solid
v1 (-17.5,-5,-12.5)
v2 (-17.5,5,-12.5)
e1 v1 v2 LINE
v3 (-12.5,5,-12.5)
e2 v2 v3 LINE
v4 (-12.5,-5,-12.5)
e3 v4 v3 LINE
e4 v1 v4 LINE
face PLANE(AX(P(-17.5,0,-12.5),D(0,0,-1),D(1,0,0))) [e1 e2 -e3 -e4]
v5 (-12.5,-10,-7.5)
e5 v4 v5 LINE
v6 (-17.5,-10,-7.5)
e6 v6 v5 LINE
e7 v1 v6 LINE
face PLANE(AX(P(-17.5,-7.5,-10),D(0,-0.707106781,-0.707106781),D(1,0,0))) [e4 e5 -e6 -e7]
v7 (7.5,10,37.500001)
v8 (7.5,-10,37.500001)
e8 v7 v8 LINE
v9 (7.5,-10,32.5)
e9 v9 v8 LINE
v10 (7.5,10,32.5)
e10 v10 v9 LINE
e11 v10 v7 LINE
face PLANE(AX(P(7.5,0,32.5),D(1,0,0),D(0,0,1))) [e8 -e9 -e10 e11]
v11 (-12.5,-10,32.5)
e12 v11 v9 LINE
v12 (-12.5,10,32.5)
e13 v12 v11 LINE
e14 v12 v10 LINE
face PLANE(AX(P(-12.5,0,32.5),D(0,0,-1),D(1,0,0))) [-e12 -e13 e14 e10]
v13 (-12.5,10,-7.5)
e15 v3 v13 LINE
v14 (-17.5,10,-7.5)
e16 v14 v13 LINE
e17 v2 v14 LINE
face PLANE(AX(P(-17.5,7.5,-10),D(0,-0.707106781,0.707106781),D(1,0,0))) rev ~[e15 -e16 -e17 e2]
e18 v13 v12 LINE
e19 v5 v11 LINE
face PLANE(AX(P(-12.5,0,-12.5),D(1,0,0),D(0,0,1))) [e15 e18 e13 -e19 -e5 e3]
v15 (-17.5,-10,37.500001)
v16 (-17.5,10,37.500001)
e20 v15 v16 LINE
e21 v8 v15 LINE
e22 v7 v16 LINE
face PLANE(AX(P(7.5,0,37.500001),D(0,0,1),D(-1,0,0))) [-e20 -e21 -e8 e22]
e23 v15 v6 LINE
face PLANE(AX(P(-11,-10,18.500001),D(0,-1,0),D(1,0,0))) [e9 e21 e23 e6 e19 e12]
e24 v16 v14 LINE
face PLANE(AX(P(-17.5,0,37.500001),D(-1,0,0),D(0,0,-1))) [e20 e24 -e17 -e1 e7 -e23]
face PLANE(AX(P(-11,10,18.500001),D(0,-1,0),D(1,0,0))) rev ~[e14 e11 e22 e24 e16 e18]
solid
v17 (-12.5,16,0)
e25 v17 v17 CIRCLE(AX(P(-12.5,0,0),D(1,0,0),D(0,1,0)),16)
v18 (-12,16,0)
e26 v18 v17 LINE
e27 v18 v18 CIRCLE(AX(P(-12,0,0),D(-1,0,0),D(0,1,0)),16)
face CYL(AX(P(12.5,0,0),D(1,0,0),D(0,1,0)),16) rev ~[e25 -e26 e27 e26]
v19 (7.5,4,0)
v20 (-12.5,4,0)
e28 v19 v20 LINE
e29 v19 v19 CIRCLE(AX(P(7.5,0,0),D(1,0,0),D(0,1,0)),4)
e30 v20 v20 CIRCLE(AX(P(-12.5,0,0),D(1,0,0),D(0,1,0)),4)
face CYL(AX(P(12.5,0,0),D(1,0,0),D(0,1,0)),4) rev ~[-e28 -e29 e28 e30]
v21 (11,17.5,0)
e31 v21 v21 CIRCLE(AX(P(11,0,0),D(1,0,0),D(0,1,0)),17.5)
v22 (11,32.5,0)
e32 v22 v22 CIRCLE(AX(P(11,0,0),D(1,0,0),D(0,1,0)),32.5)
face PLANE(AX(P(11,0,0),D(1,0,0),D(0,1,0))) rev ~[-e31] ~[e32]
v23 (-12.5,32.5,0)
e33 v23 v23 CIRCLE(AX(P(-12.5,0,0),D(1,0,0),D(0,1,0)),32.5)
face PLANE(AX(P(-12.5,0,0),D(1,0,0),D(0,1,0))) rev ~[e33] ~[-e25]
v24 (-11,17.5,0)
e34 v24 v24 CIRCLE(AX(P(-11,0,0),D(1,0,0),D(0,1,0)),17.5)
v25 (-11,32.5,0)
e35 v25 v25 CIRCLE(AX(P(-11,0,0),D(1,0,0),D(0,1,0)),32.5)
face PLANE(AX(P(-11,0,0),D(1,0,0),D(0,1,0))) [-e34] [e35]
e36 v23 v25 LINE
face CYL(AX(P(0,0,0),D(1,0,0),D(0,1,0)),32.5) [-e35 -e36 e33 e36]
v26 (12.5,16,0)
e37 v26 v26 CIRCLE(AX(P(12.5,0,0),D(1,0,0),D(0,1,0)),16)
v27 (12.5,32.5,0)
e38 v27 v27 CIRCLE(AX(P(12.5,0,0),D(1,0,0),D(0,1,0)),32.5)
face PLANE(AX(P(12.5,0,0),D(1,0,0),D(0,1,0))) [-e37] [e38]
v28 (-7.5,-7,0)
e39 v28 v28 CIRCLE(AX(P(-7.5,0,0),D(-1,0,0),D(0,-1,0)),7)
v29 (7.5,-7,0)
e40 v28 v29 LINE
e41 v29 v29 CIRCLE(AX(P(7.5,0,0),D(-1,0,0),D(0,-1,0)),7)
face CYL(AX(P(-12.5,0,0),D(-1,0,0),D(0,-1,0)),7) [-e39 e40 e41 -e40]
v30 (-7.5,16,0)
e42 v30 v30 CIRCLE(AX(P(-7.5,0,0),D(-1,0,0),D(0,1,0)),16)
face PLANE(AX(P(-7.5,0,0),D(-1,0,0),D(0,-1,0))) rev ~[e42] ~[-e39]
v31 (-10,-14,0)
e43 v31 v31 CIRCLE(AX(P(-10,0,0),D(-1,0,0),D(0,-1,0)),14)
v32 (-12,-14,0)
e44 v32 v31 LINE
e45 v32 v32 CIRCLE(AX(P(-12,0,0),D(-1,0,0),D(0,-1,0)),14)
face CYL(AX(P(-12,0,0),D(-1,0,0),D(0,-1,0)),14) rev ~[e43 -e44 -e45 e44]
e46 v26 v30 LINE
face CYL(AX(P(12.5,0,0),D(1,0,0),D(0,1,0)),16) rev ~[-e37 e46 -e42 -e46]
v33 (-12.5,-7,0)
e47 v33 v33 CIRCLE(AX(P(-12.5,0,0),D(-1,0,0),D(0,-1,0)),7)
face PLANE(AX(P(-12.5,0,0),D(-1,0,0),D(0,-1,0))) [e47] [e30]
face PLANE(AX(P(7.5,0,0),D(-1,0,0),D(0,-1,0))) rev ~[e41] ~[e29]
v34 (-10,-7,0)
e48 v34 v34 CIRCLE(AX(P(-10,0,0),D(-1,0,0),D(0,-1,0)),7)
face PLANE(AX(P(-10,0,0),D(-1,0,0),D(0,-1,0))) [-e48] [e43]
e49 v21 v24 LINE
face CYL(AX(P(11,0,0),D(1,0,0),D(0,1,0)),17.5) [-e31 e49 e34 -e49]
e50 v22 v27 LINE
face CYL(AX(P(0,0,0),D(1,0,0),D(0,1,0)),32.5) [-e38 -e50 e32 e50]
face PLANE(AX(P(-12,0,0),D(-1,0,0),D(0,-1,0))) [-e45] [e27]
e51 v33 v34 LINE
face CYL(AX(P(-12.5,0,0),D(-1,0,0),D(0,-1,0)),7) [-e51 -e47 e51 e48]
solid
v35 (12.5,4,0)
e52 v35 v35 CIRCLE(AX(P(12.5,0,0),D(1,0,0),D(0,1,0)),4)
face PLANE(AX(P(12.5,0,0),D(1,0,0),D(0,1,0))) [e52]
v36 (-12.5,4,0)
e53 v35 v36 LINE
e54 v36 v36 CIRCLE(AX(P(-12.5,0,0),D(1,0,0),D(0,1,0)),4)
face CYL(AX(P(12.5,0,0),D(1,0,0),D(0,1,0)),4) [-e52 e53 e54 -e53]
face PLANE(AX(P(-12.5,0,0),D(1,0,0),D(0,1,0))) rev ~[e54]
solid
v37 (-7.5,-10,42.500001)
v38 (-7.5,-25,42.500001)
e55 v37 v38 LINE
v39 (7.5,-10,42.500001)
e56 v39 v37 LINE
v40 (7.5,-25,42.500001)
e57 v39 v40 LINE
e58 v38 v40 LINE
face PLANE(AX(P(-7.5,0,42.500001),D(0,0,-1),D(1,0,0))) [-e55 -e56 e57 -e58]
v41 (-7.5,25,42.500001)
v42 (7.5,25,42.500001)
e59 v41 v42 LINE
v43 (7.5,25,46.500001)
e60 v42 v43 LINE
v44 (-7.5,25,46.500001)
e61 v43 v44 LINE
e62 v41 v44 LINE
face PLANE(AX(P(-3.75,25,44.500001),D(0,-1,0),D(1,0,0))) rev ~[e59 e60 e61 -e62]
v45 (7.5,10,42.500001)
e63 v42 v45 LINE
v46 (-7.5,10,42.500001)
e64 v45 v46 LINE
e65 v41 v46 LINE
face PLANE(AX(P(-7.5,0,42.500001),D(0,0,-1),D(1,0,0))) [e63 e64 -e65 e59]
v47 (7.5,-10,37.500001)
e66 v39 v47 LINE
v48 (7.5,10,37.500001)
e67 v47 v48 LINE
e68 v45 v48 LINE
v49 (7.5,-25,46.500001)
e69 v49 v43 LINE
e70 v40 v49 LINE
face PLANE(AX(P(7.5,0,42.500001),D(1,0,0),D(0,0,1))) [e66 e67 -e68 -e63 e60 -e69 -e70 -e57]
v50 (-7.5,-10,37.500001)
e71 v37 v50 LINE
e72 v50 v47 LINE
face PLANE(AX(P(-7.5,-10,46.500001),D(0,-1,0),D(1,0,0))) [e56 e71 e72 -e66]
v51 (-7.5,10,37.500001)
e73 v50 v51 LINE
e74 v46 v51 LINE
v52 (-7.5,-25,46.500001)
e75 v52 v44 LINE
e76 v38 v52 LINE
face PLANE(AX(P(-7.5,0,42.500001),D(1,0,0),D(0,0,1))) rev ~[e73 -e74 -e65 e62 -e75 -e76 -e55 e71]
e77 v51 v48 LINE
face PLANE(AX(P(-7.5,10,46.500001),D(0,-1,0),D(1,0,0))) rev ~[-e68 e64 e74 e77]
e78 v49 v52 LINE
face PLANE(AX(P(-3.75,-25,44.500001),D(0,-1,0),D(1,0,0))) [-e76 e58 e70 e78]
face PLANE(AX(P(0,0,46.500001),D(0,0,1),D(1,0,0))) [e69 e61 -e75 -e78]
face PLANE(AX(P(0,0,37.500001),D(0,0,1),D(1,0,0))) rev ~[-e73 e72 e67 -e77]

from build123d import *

# Parameters (mm, degrees)
F0_R      = 32.5
F1_DEPTH  = 12.5
F3_DEPTH  = 10
F2_W      = 7.5
F2_H      = 4
F4_DEPTH  = 25
F5_W      = 15
F5_H      = 20
F6_DEPTH  = 9
F7_R      = 4
F8_DEPTH  = 25
F9_START  = -1.5
F7_R_2    = 32.5
F7_R_3    = 17.5
F9_DEPTH  = 22
F7_R_4    = 16
F10_DEPTH = 25
F11_SIZE  = 5
F13_START = -0.5
F12_R     = 16
F12_R_2   = 14
F13_DEPTH = 2
F14_START = -2.5
F12_R_3   = 7
F14_DEPTH = 2.5
F15_DEPTH = 20
F16_DEPTH = 25


with BuildPart() as f1:
    # F0 (on Right) → F1 (new body, symmetric)
    with BuildSketch(Plane.YZ):
        Circle(F0_R)
    extrude(amount=F1_DEPTH, both=True)

    # F7 (on face) → F9 (cut)
    with BuildSketch(Plane.YZ.offset(12.5).offset(F9_START)):
        Circle(F7_R_2)
        Circle(F7_R_3, mode=Mode.SUBTRACT)
    extrude(amount=-F9_DEPTH, mode=Mode.SUBTRACT)

    # F7 (on face) → F10 (cut)
    with BuildSketch(Plane.YZ.offset(12.5)):
        Circle(F7_R_4)
        Circle(F7_R, mode=Mode.SUBTRACT)
        Circle(F7_R)
    extrude(amount=-F10_DEPTH, mode=Mode.SUBTRACT)

    # F12 (on face) → F13 (join)
    with BuildSketch(Plane(origin=(-12.5, 0, 0), x_dir=(0, -1, 0), z_dir=(-1, 0, 0)).offset(F13_START)):
        Circle(F12_R)
        Circle(F12_R_2, mode=Mode.SUBTRACT)
    extrude(amount=-F13_DEPTH)

    # F12 (on face) → F14 (join)
    with BuildSketch(Plane(origin=(-12.5, 0, 0), x_dir=(0, -1, 0), z_dir=(-1, 0, 0)).offset(F14_START)):
        Circle(F12_R)
        Circle(F12_R_2, mode=Mode.SUBTRACT)
        Circle(F12_R_2)
        Circle(F12_R_3, mode=Mode.SUBTRACT)
        Circle(F12_R_3)
    extrude(amount=-F14_DEPTH)

    # F12 (on face) → F15 (join)
    with BuildSketch(Plane(origin=(-12.5, 0, 0), x_dir=(0, -1, 0), z_dir=(-1, 0, 0))):
        Circle(F12_R_3)
    extrude(amount=-F15_DEPTH)

    # F7 (on face) → F16 (cut)
    with BuildSketch(Plane.YZ.offset(12.5)):
        Circle(F7_R)
    extrude(amount=-F16_DEPTH, mode=Mode.SUBTRACT)


with BuildPart() as f3:
    # F2 (on Front) → F3 (new body, symmetric)
    with BuildSketch(Plane.XZ):
        Polygon((-12.5, -12.5), (-12.5, 32.5), (7.5, 32.5), (7.5, 37.5000014901), (-17.5, 37.5000014901), (-17.5, -12.5), align=None)
    extrude(amount=F3_DEPTH, both=True)

    # F11
    f11_edges = [f3.edges().sort_by_distance(p)[0] for p in [
        (-15, 10, -12.5),
        (-15, -10, -12.5),
    ]]
    chamfer(f11_edges, length=F11_SIZE)


with BuildPart() as f4:
    # F2 (on Front) → F4 (new body, symmetric)
    with BuildSketch(Plane.XZ):
        with Locations((-3.75, 44.5000014901)):
            Rectangle(F2_W, F2_H)
        with Locations((3.75, 44.5000014901)):
            Rectangle(F2_W, F2_H)
    extrude(amount=F4_DEPTH, both=True)

    # F5 (on face) → F6 (join, through all)
    with BuildSketch(Plane.XY.offset(46.5000014901)):
        Rectangle(F5_W, F5_H)
    extrude(amount=-F6_DEPTH)


with BuildPart() as f8:
    # F7 (on face) → F8 (new body, through all)
    with BuildSketch(Plane.YZ.offset(12.5)):
        Circle(F7_R)
    extrude(amount=-F8_DEPTH)


solid = Compound([f1.part, f3.part, f4.part, f8.part])
